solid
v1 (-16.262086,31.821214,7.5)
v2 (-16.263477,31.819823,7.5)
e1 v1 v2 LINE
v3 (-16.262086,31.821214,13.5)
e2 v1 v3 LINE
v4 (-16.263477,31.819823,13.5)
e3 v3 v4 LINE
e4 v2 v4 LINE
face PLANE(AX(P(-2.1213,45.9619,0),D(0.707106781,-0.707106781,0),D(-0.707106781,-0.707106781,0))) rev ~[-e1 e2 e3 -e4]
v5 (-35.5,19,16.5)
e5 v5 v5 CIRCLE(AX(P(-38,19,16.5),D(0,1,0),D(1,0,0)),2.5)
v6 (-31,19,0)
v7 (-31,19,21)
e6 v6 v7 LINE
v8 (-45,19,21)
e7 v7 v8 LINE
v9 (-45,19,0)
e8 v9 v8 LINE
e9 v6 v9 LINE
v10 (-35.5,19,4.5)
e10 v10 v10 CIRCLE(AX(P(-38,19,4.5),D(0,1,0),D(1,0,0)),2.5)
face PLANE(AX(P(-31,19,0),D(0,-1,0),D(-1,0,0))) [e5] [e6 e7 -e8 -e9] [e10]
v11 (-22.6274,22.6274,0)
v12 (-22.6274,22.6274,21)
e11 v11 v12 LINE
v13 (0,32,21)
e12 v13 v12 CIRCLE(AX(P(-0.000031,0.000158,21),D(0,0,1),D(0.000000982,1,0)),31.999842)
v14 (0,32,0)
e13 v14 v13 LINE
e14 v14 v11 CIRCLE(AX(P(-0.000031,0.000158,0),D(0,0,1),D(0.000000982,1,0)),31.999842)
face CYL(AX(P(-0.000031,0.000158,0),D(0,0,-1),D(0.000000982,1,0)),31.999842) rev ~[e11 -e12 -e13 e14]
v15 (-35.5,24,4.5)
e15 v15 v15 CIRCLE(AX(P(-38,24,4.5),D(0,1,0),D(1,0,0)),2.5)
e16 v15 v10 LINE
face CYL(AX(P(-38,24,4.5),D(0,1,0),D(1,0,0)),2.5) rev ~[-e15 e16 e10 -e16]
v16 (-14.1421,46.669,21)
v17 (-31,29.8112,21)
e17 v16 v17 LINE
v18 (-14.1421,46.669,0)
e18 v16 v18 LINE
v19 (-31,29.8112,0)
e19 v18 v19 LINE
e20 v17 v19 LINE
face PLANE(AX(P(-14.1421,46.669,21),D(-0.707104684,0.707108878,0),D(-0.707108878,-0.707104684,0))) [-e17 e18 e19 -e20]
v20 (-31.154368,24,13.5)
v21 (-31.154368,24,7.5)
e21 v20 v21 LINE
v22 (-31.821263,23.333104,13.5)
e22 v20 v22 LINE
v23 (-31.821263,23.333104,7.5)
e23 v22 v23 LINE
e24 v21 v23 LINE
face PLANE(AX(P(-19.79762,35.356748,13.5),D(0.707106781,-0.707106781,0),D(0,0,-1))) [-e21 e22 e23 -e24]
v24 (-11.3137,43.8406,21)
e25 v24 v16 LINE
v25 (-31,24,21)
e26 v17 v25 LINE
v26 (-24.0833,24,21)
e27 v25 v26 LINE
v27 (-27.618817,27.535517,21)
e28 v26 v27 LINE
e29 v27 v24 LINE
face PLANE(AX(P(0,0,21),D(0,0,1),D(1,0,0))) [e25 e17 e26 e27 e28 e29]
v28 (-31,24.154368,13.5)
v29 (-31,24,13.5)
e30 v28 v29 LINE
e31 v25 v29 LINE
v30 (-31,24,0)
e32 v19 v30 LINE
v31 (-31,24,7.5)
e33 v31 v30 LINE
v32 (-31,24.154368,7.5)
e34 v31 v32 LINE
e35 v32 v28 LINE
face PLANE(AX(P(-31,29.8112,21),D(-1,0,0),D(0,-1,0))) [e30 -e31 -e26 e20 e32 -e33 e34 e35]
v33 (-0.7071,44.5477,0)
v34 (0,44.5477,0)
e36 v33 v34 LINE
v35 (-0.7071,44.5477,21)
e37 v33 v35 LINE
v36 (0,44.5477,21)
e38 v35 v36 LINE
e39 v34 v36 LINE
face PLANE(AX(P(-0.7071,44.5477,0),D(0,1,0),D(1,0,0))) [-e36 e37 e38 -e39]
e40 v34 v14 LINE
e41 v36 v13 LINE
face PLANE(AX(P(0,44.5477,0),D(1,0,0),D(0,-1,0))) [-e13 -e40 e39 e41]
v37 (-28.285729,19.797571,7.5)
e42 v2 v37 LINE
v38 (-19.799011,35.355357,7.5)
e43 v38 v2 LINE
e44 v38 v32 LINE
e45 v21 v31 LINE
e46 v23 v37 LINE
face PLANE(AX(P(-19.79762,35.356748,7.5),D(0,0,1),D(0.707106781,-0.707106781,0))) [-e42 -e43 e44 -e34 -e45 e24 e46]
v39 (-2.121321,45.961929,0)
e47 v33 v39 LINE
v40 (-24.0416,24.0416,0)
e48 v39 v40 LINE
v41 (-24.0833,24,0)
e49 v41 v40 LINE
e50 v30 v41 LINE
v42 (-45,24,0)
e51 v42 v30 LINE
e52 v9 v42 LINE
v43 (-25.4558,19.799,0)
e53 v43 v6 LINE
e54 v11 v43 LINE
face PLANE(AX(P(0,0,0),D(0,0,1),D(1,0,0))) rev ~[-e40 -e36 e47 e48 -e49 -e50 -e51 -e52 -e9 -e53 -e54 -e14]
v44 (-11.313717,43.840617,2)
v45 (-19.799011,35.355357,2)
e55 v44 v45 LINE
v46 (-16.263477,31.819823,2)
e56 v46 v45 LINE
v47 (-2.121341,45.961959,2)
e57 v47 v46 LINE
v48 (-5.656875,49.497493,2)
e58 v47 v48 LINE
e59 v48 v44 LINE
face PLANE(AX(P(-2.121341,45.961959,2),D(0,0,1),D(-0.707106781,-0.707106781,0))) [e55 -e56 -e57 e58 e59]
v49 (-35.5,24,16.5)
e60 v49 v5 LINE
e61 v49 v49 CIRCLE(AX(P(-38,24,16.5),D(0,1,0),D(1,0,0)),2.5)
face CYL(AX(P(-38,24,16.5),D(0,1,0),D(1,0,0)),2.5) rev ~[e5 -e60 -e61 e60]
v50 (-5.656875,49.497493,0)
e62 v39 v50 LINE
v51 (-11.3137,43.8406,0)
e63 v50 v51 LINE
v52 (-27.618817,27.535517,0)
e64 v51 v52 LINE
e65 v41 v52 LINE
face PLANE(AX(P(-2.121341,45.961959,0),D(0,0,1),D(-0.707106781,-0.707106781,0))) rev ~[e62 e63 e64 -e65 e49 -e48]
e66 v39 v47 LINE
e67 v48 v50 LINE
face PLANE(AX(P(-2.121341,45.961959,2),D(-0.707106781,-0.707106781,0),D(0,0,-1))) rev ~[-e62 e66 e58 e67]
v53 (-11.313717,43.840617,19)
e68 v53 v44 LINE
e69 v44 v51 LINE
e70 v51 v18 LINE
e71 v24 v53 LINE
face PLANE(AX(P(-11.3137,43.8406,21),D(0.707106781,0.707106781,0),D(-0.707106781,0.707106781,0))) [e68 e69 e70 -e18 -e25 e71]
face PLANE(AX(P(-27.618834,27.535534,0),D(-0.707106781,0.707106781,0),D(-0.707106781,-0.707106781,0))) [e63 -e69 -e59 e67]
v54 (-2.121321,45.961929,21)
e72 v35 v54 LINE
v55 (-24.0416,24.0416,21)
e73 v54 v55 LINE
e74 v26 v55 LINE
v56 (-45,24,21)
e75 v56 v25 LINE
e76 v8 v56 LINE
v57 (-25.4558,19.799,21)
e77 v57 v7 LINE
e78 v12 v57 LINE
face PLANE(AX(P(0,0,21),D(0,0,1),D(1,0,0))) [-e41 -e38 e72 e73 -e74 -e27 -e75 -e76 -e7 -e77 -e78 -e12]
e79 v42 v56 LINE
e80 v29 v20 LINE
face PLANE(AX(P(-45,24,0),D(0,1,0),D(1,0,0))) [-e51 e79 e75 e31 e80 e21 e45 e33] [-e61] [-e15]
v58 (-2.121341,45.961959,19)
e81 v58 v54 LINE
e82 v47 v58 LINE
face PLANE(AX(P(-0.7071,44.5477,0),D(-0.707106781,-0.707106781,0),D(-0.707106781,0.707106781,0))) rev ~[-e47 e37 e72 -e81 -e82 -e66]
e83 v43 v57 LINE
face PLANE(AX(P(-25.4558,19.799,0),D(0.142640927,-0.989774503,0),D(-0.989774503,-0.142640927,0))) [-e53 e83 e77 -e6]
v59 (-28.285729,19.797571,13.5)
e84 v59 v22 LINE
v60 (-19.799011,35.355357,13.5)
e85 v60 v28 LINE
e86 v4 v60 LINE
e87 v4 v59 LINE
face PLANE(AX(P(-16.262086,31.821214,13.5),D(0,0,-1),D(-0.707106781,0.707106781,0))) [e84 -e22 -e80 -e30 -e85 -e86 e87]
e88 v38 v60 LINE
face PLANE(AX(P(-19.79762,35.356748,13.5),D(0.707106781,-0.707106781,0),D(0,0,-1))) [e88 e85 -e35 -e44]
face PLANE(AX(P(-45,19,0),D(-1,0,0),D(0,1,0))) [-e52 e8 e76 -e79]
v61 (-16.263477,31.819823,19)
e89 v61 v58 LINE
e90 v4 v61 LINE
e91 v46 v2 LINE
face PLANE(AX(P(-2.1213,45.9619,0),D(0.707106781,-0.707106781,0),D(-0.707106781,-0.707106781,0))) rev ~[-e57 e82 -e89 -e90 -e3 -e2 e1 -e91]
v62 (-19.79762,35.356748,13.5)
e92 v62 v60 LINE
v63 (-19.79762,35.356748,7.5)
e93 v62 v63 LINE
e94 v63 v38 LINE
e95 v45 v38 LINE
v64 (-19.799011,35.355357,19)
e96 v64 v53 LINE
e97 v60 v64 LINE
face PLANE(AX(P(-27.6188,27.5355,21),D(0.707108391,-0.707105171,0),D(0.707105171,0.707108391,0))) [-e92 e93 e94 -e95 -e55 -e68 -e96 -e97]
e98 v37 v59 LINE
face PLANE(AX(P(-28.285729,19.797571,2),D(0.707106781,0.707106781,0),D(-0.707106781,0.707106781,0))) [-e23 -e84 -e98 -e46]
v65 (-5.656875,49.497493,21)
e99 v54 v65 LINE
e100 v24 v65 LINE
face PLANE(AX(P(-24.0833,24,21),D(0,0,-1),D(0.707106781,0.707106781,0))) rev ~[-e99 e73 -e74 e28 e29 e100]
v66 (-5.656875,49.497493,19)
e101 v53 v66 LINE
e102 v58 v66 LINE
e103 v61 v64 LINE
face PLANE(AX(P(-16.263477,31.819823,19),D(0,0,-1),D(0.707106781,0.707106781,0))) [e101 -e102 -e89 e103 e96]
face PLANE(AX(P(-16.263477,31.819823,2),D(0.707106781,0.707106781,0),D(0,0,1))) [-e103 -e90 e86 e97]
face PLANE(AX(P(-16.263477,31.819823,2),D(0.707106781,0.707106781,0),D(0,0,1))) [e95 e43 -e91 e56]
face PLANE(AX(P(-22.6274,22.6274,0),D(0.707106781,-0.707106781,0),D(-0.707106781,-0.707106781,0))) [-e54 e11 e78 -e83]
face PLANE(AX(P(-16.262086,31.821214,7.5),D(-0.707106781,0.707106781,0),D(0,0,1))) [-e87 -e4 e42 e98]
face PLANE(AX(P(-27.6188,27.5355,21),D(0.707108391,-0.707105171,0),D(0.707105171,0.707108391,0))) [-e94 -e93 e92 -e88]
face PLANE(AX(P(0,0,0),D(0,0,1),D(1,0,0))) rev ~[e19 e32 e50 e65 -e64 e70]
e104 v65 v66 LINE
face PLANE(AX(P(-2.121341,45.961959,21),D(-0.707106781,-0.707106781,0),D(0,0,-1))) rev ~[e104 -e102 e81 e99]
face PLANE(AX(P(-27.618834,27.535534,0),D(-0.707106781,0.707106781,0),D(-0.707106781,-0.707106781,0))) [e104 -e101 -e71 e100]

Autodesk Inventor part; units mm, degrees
ref_plane "YZ Plane" through (0, 0, 0) normal (1, 0, 0) x (0, 1, 0)
ref_plane "XZ Plane" through (0, 0, 0) normal (0, 1, 0) x (-1, 0, 0)
ref_plane "XY Plane" through (0, 0, 0) normal (0, 0, 1) x (1, 0, 0)
sketch "Sketch1" plane through (0, 0, 0) normal (0, 0, 1) x (1, 0, 0)
  line L0 (0, 0) -> (-22.6274, 22.6274) construction
  circle A0 centre (0, 0) radius 32 construction
  line L1 (-31, 0) -> (-45, 0) construction
  line L2 (-45, 0) -> (-45, 19) construction
  line L3 (-45, 19) -> (-31, 19) construction
  line L4 (-31, 19) -> (-31, 0) construction
  line L5 (-31, 0) -> (0, 0) construction
  circle A1 centre (0, 0) radius 30 construction
  line L6 (-22.6274, 22.6274) -> (-0.7071, 44.5477)
  line L7 (-0.7071, 44.5477) -> (-2.1213, 45.9619)
  line L8 (-2.1213, 45.9619) -> (-24.0416, 24.0416)
  line L9 (-24.0416, 24.0416) -> (-22.6274, 22.6274)
  line L10 (-24.0416, 24.0416) -> (-22.6274, 22.6274)
  line L11 (-22.6274, 22.6274) -> (-25.4558, 19.799)
  line L12 (-25.4558, 19.799) -> (-26.8701, 21.2132)
  line L13 (-26.8701, 21.2132) -> (-24.0416, 24.0416)
  line L14 (-25.4558, 19.799) -> (-31, 19)
  line L15 (-31, 19) -> (-45, 19)
  line L16 (-45, 19) -> (-45, 24)
  line L17 (-45, 24) -> (-24.0833, 24)
  line L18 (-26.8701, 21.2132) -> (-24.0833, 24)
  line L19 (-0.7071, 44.5477) -> (0, 44.5477)
  line L20 (0, 44.5477) -> (0, 32)
  arc A2 (0, 32) -> (-22.6274, 22.6274) centre (0, 0) ccw
  point P0 (0, 38.2739)
  dimension "d0" = 19
  dimension "d1" = 31
  dimension "d2" = 14
  dimension "d4" = 60
  dimension "d5" = 2
  dimension "d6" = 2
  dimension "d8" = 4
  dimension "d9" = 35
  dimension "d10" = 45
  dimension "d13" = 5
extrude "Extrusion1" add sketch "Sketch1" along normal blind 21
sketch "Sketch2" plane through (-24.0833, 24, 0) normal (-0.7071068, 0.7071068, 0) x (-0.7071068, -0.7071068, 0)
  line L0 (-31.0589, 0) -> (-31.0589, 21) construction
  line L1 (-31.0589, 2) -> (-11.0589, 2)
  line L2 (-11.0589, 2) -> (-11.0589, 19)
  line L3 (-11.0589, 19) -> (-31.0589, 19)
  line L4 (-31.0589, 19) -> (-31.0589, 2)
  line L5 (-31.0589, 0) -> (0, 0) construction
  line L6 (-31.0589, 21) -> (0, 21) construction
  line L7 (-31.0589, 2) -> (-31.0589, 0)
  line L8 (0, 0) -> (0, 21) projected
  line L9 (-31.0589, 0) -> (0, 0)
  line L10 (0, 0) -> (0, 21)
  line L11 (0, 21) -> (-31.0589, 21)
  line L12 (-31.0589, 21) -> (-31.0589, 19)
  point P0 (-0.0589, 0)
  point P1 (-31.0589, 10.5)
  dimension "d14" = 17
  dimension "d15" = 20
extrude "Extrusion2" add sketch "Sketch2" along normal blind 5 contours L1 L2 L3 L12 L11 L8 L9 L7
sketch "Sketch3" plane through (-16.2635, 31.8198, 2) normal (0.7071068, 0.7071068, 0) x (-0.7071068, 0.7071068, 0)
  line L0 (0, 0) -> (0, 17) construction
  line L1 (0, 0) -> (5, 0) construction
  line L2 (5, 17) -> (5, 0) construction
  line L3 (0, 17) -> (5, 17) construction
  line L4 (5, 5.5) -> (0, 5.5)
  line L5 (0, 5.5) -> (0, 11.5)
  line L6 (0, 11.5) -> (5, 11.5)
  line L7 (5, 11.5) -> (5, 5.5)
  line L8 (0, 0) -> (0, 17) projected
  point P0 (-34, -2)
  point P1 (5, 8.5)
  point P2 (0, 8.5)
  dimension "d18" = 6
sketch "Sketch4" plane through (0, 0, 21) normal (0, 0, 1) x (1, 0, 0)
  line L0 (-24.0833, 24) -> (-45, 24) projected
  line L1 (-45, 24) -> (-45, 19) projected
  line L2 (-45, 19) -> (-31, 19) projected
  line L3 (-31, 19) -> (-25.4558, 19.799) projected
  line L4 (-25.4558, 19.799) -> (-22.6274, 22.6274) projected
  line L5 (-0.7071, 44.5477) -> (-5.6569, 49.4975) projected
  line L6 (-27.6188, 27.5355) -> (-5.6569, 49.4975) projected
  line L7 (-24.0833, 24) -> (-27.6188, 27.5355) projected
  line L8 (-11.3137, 43.8406) -> (-14.1421, 46.669)
  line L9 (-14.1421, 46.669) -> (-31, 29.8112)
  line L10 (-31, 29.8112) -> (-31, 24)
  arc A0 (0, 32) -> (-22.6274, 22.6274) centre (0, 0) ccw projected
  line L11 (0, 32) -> (0, 44.5477) projected
  line L12 (0, 44.5477) -> (-0.7071, 44.5477) projected
  dimension "d19" = 8
  dimension "d20" = 4
extrude "Extrusion3" add sketch "Sketch4" against normal up to surface (21 mm away) contours L0 L10 L9 L8 L6 L7
extrude "Extrusion4" cut sketch "Sketch3" against normal blind 17
sketch "Sketch5" plane through (-45, 24, 21) normal (0, 1, 0) x (1, 0, 0)
  line L0 (14, 0) -> (14, 7.5) construction
  line L1 (14, 21) -> (0, 21) construction
  line L2 (0, 21) -> (0, 0) construction
  line L3 (14, 0) -> (0, 0) construction
  line L4 (0, 21) -> (0, 0) construction
  line L5 (0, 10.5) -> (14, 10.5) construction
  line L6 (14, 0) -> (14, 21) construction
  line L7 (7, 16.5) -> (7, 4.5) construction
  circle A0 centre (7, 16.5) radius 2.5
  circle A1 centre (7, 4.5) radius 2.5
  line L8 (13.8457, 13.5) -> (14, 13.5) projected
  line L9 (14, 13.5) -> (14, 21) projected
  line L10 (14, 7.5) -> (13.8457, 7.5) projected
  line L11 (13.8457, 7.5) -> (13.8457, 13.5) projected
  point P0 (45, 21)
  point P1 (7, 10.5)
  dimension "d25" = 5
  dimension "d26" = 12
extrude "Extrusion5" cut sketch "Sketch5" against normal through all
properties part number "hall follower"
